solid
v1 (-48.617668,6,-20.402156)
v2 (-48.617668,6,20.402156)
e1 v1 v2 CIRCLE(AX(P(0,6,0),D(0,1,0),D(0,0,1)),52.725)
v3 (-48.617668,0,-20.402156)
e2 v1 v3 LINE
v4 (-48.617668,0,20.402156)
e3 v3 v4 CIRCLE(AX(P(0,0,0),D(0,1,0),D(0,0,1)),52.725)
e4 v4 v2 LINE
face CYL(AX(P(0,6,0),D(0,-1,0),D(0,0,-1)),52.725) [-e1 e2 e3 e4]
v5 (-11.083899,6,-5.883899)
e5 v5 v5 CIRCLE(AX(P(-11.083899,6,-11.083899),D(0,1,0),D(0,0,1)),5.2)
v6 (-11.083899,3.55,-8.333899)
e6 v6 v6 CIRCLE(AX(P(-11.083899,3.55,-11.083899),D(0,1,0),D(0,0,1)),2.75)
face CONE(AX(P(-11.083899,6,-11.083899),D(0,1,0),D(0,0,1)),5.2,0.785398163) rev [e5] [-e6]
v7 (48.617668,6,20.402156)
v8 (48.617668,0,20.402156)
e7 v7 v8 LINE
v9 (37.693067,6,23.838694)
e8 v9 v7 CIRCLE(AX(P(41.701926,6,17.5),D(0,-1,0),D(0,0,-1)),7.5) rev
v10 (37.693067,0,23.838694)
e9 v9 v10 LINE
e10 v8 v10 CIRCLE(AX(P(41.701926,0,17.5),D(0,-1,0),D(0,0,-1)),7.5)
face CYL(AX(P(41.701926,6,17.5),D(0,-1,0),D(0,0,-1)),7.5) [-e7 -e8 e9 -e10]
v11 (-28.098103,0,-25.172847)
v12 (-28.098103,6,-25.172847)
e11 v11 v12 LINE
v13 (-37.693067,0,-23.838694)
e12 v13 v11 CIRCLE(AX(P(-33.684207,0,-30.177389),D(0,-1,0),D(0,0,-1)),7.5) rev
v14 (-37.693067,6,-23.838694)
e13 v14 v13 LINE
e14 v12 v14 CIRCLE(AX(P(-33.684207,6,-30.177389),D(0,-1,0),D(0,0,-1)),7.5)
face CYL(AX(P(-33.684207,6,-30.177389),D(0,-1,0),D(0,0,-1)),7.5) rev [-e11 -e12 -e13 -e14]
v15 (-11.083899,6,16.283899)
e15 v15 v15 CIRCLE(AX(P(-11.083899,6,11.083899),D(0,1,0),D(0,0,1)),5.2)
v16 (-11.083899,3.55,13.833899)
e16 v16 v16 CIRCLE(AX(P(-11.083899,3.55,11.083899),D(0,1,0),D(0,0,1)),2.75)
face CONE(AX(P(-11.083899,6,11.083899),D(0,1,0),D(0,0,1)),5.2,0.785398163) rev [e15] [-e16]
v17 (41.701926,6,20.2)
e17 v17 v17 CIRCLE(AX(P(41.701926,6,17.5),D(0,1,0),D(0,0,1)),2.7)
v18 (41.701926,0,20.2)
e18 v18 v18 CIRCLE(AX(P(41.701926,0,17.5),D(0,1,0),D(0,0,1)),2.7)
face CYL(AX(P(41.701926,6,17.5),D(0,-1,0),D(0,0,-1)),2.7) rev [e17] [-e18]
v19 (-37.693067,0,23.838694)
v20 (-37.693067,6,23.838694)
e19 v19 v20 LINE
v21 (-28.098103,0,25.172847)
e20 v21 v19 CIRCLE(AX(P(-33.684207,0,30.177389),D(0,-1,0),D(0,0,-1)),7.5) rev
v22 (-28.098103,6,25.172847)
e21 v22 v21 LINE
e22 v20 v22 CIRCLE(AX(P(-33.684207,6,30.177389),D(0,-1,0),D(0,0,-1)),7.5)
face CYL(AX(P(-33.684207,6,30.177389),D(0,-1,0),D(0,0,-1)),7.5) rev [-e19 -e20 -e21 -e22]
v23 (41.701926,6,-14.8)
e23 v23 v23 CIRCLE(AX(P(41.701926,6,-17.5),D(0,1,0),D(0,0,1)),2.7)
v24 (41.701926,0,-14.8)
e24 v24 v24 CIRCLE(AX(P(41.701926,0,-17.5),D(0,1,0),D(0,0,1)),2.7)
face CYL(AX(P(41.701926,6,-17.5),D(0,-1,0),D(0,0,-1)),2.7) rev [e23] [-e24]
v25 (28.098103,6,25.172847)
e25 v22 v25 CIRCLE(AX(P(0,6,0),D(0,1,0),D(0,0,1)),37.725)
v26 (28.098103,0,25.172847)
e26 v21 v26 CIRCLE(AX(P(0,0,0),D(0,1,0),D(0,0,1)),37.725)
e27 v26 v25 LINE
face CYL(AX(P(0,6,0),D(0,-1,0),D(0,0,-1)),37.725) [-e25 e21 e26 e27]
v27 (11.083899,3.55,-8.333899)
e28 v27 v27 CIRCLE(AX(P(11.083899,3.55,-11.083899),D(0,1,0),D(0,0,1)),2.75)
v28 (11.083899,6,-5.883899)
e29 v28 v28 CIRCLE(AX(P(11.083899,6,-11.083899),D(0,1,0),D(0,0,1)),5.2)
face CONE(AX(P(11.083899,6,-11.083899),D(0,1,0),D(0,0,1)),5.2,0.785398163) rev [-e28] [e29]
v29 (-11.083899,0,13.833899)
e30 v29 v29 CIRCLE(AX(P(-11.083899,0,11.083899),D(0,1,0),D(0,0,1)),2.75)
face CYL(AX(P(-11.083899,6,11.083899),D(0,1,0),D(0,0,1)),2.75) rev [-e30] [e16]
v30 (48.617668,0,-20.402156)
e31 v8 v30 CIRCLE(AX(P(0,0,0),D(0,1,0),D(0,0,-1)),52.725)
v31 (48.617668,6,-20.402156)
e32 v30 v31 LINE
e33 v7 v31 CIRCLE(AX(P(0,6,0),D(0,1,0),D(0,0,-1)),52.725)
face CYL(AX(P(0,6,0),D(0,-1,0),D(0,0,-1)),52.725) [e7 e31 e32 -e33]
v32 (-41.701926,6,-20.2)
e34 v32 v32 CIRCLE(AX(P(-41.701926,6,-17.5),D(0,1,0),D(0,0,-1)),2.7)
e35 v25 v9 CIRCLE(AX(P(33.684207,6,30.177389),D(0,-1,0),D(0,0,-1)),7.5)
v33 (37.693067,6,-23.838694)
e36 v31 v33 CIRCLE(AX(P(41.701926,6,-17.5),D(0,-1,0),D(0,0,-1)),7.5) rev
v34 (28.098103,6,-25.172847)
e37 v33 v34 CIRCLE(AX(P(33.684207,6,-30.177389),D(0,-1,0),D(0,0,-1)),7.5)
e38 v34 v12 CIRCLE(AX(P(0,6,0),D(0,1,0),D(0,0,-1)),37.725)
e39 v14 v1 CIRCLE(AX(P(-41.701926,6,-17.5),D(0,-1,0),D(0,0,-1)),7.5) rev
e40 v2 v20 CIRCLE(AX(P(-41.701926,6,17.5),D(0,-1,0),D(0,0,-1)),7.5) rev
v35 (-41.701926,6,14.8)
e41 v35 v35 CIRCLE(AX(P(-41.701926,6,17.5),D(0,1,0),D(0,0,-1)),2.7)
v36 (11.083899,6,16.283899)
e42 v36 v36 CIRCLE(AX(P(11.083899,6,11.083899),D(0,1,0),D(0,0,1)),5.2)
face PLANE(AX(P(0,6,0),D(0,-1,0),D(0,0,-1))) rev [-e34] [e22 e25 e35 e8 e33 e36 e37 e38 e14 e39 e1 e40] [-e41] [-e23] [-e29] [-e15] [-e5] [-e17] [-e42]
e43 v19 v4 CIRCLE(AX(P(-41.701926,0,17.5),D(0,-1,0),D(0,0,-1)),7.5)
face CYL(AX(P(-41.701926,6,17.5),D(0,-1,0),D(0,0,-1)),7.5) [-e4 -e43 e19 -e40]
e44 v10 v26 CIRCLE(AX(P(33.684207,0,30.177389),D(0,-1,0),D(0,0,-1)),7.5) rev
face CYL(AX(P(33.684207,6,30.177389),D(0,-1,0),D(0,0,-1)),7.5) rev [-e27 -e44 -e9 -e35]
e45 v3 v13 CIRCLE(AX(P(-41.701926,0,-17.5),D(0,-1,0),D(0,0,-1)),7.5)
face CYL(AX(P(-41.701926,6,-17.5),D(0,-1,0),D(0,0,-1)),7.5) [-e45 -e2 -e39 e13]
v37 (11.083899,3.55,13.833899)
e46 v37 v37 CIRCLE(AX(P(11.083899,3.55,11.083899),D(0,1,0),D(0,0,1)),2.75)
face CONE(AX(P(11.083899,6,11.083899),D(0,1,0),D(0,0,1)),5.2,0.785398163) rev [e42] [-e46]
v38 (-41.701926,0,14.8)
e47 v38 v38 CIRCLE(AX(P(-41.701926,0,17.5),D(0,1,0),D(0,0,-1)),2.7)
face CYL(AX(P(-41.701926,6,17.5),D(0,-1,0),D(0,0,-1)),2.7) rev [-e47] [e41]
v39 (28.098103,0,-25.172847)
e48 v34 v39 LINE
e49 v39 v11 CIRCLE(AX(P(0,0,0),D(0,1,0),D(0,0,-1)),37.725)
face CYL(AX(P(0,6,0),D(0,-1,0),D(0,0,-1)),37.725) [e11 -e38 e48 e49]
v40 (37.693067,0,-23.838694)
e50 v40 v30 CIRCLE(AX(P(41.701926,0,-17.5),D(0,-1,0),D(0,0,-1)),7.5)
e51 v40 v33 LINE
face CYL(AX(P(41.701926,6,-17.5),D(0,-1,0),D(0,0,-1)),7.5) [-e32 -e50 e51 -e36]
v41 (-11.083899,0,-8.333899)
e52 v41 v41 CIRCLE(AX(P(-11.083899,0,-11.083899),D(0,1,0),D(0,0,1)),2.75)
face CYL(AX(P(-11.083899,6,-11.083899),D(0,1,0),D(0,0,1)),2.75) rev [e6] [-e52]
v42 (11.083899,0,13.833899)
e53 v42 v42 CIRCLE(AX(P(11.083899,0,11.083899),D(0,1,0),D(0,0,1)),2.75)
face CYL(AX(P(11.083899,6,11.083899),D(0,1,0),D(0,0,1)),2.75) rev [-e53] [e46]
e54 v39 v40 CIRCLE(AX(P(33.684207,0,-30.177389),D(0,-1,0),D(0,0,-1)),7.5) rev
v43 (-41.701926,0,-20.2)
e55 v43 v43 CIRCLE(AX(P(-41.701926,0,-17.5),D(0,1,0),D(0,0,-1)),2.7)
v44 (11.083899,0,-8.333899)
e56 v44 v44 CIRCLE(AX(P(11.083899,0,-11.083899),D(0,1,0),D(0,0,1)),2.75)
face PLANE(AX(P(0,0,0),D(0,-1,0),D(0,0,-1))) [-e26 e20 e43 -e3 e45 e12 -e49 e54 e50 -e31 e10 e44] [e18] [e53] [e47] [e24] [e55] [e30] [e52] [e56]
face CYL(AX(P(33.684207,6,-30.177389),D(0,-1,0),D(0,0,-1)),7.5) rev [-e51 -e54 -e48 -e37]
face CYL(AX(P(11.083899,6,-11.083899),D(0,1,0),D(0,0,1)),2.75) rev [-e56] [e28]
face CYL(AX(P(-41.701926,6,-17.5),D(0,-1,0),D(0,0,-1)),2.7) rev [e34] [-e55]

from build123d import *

# Parameters (mm, degrees)
SKETCH1_R                                       = 2.6
SKETCH1_R_2                                     = 2.7
BOSS_EXTRUDE1_DEPTH                             = 6
FILLET1_R                                       = 7.5
CSK_FOR_M5_FLAT_HEAD_MACHINE_SCREW1_D           = 5.5
CSK_FOR_M5_FLAT_HEAD_MACHINE_SCREW1_CSINK_D     = 10.4
CSK_FOR_M5_FLAT_HEAD_MACHINE_SCREW1_CSINK_ANGLE = 90


with BuildPart() as part:
    # Sketch1 → Boss-Extrude1 (new body)
    with BuildSketch(Plane(origin=(0, 0, 0), x_dir=(1, 0, 0), z_dir=(0, 1, 0))):
        with BuildLine():
            Line((31.883633055, 20.164562188), (44.561021943, 28.182280752))
            ThreePointArc((44.561021943, 28.182280752), (52.725, 0), (44.561021943, -28.182280752))
            Line((44.561021943, -28.182280752), (31.883633055, -20.164562188))
            ThreePointArc((31.883633055, -20.164562188), (0, -37.725), (-31.883633055, -20.164562188))
            Line((-31.883633055, -20.164562188), (-44.561021943, -28.182280752))
            ThreePointArc((-44.561021943, -28.182280752), (-52.725, 0), (-44.561021943, 28.182280752))
            Line((-44.561021943, 28.182280752), (-31.883633055, 20.164562188))
            ThreePointArc((-31.883633055, 20.164562188), (0, 37.725), (31.883633055, 20.164562188))
        make_face()
        with Locations(Location((-11.083898795, 11.083898795, 0), (0, 0, 270))):
            Circle(SKETCH1_R, mode=Mode.SUBTRACT)
        with Locations(Location((11.083898795, 11.083898795, 0), (0, 0, 270))):
            Circle(SKETCH1_R, mode=Mode.SUBTRACT)
        with Locations(Location((11.083898795, -11.083898795, 0), (0, 0, 270))):
            Circle(SKETCH1_R, mode=Mode.SUBTRACT)
        with Locations(Location((-11.083898795, -11.083898795, 0), (0, 0, 270))):
            Circle(SKETCH1_R, mode=Mode.SUBTRACT)
        with Locations(Location((41.701925915, 17.5, 0), (0, 0, 270))):
            Circle(SKETCH1_R_2, mode=Mode.SUBTRACT)
        with Locations(Location((41.701925915, -17.5, 0), (0, 0, 270))):
            Circle(SKETCH1_R_2, mode=Mode.SUBTRACT)
        with Locations(Location((-41.701925915, 17.5, 0), (0, 0, 90))):
            Circle(SKETCH1_R_2, mode=Mode.SUBTRACT)
        with Locations(Location((-41.701925915, -17.5, 0), (0, 0, 90))):
            Circle(SKETCH1_R_2, mode=Mode.SUBTRACT)
    extrude(amount=BOSS_EXTRUDE1_DEPTH)

    # Fillet1
    fillet1_edges = [part.edges().sort_by_distance(p)[0] for p in [
        (44.561021943, 3, 28.182280752),
        (31.883633055, 3, 20.164562188),
        (-44.561021943, 3, 28.182280752),
        (-31.883633055, 3, 20.164562188),
        (44.561021943, 3, -28.182280752),
        (31.883633055, 3, -20.164562188),
        (-44.561021943, 3, -28.182280752),
        (-31.883633055, 3, -20.164562188),
    ]]
    fillet(fillet1_edges, radius=FILLET1_R - 0.0001)  # a hair under: the kernel refuses the full size

    # CSK for M5 Flat Head Machine Screw1 (through all)
    with Locations(Plane(origin=(0, 6, 0), x_dir=(1, 0, 0), z_dir=(0, 1, 0))):
        with Locations((-11.083898795, 11.083898795), (11.083898795, 11.083898795), (11.083898795, -11.083898795), (-11.083898795, -11.083898795)):
            CounterSinkHole(CSK_FOR_M5_FLAT_HEAD_MACHINE_SCREW1_D / 2, CSK_FOR_M5_FLAT_HEAD_MACHINE_SCREW1_CSINK_D / 2, counter_sink_angle=CSK_FOR_M5_FLAT_HEAD_MACHINE_SCREW1_CSINK_ANGLE)


solid = part.part
